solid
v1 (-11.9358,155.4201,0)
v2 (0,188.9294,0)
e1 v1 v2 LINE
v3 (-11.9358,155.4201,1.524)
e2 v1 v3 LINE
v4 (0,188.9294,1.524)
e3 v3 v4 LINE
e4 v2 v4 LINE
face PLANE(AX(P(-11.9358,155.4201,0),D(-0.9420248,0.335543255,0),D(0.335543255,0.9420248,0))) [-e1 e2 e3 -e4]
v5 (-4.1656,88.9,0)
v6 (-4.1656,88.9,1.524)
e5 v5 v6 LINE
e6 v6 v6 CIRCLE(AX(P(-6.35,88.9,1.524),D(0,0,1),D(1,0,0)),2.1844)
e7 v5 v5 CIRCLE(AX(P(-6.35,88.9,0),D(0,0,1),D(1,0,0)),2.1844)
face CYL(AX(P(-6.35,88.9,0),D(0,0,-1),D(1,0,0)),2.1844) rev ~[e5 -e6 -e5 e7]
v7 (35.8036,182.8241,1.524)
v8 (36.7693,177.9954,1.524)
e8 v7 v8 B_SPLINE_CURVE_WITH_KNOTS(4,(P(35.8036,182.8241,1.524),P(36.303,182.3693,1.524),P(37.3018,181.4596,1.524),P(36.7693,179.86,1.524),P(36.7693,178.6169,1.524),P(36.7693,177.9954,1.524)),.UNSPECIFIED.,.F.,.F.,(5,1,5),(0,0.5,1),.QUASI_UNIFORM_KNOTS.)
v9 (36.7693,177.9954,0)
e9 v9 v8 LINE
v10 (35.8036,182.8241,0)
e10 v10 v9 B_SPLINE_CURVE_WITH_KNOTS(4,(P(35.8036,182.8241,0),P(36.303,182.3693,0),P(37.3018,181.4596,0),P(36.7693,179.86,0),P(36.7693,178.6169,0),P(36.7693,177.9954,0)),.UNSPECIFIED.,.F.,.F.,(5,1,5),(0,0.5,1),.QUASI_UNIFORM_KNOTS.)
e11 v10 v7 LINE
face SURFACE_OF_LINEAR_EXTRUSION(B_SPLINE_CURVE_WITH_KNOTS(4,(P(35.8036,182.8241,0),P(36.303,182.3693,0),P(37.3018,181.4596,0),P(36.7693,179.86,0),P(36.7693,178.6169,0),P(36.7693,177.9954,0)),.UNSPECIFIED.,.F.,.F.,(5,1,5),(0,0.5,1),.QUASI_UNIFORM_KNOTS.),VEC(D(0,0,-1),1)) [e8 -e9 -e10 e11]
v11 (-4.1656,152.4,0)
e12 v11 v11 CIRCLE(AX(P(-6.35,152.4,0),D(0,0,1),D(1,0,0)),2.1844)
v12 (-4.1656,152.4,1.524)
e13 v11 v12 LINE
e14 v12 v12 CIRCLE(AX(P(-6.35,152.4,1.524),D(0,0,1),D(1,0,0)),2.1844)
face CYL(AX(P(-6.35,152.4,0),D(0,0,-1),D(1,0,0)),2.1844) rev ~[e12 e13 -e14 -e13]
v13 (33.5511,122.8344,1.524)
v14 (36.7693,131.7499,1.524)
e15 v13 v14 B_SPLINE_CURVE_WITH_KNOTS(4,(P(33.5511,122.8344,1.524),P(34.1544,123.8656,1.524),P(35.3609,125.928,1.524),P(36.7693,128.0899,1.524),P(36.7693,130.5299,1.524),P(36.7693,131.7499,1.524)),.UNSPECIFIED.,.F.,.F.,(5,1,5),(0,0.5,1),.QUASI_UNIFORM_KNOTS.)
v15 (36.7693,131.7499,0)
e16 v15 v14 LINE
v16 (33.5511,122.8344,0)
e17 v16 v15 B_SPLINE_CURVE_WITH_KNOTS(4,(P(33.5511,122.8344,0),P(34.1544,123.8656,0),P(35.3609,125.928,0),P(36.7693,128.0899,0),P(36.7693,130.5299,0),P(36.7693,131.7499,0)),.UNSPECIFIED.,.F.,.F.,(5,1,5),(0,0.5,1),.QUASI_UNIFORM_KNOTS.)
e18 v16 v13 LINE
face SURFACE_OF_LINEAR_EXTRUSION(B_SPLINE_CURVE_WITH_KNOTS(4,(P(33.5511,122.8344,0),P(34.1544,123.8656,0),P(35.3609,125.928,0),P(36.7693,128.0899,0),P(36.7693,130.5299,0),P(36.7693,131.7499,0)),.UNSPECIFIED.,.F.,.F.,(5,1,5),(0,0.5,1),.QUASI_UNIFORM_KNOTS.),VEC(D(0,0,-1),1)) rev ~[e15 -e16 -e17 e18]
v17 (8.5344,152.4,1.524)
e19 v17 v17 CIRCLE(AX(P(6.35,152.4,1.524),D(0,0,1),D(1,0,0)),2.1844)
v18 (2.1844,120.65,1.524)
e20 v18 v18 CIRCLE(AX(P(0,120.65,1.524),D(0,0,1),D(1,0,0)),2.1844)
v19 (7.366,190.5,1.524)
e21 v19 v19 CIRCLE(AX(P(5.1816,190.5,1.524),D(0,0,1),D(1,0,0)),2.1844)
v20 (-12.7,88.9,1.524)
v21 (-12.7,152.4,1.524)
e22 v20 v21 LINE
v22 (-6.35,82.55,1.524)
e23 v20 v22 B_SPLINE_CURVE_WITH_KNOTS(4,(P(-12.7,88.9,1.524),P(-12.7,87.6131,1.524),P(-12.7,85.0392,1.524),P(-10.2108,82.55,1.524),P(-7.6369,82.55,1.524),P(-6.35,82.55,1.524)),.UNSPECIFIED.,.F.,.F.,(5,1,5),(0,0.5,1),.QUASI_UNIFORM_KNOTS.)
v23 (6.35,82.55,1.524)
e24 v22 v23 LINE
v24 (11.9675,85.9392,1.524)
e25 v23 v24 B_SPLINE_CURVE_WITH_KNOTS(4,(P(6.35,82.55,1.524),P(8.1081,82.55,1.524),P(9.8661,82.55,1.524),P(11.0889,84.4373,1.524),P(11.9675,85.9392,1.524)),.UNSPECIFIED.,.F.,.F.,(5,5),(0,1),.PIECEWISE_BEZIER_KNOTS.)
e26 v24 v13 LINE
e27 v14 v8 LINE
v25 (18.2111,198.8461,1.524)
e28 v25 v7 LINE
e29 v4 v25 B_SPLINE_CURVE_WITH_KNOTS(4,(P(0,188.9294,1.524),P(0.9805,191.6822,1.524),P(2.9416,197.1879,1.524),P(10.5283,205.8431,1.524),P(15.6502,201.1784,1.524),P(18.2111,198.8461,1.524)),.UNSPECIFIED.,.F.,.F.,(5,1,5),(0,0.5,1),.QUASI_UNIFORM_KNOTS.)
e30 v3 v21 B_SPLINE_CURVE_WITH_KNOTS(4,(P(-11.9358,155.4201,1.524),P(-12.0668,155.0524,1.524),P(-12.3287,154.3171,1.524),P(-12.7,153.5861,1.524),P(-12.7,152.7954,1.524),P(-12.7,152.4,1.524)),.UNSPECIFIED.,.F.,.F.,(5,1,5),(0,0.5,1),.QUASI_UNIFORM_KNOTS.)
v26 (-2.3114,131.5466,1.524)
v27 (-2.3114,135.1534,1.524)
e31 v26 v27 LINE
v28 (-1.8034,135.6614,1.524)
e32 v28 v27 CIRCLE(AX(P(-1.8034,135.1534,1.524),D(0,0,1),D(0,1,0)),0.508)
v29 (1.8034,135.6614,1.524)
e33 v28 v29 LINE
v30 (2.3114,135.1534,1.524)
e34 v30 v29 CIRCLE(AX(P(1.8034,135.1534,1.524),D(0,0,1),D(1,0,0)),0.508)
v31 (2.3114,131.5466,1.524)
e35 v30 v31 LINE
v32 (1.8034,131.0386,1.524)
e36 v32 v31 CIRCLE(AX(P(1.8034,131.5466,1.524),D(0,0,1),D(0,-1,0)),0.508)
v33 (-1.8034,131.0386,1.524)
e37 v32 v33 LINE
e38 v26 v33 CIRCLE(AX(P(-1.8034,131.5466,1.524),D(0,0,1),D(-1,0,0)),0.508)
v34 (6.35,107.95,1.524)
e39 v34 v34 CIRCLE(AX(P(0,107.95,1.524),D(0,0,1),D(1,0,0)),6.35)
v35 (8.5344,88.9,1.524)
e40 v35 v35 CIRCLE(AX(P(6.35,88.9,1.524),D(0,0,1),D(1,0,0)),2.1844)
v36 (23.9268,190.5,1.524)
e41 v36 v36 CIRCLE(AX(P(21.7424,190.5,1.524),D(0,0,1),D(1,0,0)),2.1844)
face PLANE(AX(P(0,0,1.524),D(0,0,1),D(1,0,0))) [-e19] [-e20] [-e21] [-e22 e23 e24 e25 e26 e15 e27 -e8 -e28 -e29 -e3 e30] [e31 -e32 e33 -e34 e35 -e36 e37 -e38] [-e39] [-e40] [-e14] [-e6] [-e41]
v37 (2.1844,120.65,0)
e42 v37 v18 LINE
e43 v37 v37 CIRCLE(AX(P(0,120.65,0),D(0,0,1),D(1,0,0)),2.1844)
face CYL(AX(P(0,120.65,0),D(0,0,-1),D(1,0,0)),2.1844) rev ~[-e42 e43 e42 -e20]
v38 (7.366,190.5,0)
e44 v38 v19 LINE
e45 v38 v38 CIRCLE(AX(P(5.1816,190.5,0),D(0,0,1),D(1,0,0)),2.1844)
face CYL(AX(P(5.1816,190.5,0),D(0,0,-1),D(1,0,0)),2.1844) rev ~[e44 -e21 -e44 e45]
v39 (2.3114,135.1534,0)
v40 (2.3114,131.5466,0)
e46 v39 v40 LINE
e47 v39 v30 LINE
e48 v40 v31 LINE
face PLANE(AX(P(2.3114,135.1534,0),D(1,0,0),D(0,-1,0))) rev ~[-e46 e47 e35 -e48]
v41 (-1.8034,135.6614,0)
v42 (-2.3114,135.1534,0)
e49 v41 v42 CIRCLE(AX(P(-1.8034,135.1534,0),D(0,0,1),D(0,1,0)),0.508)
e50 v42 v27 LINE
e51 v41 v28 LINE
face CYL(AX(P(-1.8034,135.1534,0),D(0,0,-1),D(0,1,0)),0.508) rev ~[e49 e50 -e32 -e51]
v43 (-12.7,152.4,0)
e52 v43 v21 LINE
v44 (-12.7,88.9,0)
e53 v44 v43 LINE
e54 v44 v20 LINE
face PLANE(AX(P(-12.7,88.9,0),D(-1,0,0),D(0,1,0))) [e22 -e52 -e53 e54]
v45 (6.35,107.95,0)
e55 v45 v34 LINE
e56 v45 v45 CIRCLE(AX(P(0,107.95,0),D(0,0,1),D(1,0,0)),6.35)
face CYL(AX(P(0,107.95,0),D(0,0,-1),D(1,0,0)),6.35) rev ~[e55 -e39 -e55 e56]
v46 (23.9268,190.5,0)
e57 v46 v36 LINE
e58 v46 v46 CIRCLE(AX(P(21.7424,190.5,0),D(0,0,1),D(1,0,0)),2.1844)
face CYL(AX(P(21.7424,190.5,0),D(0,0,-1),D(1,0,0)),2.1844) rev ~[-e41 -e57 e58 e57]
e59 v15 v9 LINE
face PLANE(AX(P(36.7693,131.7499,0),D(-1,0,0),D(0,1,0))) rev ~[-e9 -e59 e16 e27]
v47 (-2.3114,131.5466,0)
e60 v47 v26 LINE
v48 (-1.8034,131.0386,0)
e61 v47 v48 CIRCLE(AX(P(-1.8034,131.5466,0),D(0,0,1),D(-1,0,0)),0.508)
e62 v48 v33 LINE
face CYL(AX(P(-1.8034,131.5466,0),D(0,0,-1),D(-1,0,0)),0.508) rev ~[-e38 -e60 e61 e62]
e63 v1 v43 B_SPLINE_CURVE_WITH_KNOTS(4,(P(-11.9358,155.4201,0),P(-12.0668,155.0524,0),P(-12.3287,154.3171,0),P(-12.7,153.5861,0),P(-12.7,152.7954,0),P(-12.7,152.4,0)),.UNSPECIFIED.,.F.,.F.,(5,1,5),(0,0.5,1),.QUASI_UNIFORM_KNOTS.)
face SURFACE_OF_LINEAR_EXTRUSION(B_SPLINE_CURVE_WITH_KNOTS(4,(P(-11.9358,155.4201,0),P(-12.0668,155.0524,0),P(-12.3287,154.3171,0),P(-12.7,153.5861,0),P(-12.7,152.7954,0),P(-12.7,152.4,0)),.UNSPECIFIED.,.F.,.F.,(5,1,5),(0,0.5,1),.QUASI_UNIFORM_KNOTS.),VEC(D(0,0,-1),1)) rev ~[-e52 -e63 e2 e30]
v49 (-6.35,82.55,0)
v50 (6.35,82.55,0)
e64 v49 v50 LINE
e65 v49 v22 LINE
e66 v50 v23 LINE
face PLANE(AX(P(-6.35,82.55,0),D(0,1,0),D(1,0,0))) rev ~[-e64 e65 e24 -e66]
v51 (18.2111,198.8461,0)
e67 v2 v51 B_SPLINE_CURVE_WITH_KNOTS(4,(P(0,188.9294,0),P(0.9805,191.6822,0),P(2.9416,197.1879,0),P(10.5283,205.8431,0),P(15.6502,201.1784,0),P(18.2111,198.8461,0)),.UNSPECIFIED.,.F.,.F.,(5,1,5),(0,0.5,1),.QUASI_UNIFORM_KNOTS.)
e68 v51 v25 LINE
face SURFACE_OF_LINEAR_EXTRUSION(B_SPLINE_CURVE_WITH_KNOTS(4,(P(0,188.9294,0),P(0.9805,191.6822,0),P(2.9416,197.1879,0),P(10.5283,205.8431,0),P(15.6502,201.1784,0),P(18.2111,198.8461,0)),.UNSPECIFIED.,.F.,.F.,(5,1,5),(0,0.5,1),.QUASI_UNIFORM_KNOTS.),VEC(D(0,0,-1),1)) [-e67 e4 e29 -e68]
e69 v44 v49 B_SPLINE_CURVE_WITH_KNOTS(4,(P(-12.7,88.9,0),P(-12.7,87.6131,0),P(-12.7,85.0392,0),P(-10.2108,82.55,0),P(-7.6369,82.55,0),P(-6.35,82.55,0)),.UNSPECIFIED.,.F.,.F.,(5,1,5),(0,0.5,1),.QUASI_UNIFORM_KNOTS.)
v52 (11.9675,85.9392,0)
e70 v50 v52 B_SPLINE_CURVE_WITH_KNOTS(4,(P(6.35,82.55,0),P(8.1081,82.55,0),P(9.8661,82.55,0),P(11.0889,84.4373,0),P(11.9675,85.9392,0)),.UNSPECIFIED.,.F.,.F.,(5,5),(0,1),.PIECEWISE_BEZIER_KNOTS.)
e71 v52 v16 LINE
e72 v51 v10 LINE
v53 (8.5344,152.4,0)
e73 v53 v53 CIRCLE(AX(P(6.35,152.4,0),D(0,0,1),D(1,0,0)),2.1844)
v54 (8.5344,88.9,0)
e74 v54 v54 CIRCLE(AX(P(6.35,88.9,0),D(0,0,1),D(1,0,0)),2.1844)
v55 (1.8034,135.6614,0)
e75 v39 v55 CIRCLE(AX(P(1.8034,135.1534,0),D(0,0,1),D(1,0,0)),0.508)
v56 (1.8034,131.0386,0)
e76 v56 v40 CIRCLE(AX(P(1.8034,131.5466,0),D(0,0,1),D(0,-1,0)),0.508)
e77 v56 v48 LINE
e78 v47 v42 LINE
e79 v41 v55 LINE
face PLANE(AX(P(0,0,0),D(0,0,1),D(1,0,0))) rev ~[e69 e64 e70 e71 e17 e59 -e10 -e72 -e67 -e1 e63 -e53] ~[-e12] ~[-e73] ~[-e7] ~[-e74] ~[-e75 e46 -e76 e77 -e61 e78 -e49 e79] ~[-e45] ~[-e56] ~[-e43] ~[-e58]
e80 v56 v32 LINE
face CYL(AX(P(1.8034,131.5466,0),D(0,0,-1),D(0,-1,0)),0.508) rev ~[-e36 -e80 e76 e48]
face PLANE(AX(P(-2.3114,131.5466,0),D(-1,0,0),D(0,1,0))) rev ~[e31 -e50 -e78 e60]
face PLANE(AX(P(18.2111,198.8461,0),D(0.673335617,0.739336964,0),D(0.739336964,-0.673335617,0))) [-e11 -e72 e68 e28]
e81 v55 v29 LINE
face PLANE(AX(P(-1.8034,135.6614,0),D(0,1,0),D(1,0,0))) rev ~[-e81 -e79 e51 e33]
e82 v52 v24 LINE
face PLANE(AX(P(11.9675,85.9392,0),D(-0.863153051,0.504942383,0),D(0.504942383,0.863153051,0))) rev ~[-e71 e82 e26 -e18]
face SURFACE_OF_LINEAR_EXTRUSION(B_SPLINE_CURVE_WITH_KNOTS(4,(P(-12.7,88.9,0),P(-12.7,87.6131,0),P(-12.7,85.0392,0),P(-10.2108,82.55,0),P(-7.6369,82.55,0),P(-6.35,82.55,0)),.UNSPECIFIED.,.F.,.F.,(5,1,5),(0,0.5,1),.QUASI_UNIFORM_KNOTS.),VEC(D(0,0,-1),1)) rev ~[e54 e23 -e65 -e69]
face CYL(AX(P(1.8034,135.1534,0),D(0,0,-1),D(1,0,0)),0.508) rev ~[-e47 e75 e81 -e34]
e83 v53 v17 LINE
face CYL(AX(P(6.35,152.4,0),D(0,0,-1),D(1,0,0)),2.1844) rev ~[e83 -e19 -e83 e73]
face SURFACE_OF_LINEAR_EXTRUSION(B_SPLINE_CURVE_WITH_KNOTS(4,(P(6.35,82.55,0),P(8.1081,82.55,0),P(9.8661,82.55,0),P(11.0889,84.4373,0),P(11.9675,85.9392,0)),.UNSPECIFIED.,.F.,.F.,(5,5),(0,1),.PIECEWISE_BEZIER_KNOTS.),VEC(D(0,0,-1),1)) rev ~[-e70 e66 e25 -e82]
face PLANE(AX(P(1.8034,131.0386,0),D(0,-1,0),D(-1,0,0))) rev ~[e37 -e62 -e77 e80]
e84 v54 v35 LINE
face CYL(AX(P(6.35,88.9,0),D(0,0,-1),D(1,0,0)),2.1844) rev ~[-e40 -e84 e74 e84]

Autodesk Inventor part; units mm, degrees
ref_plane "YZ Plane" through (0, 0, 0) normal (1, 0, 0) x (0, 1, 0)
ref_plane "XZ Plane" through (0, 0, 0) normal (0, 1, 0) x (-1, 0, 0)
ref_plane "XY Plane" through (0, 0, 0) normal (0, 0, 1) x (1, 0, 0)
sketch "Sketch1" plane through (0, 0, 0) normal (0, 0, 1) x (1, 0, 0)
  circle A0 centre (-6.35, 152.4) radius 2.1844
  circle A1 centre (6.35, 152.4) radius 2.1844
  circle A2 centre (-6.35, 88.9) radius 2.1844
  circle A3 centre (6.35, 88.9) radius 2.1844
  arc A4 (-1.8034, 135.6614) -> (-2.3114, 135.1534) centre (-1.8034, 135.1534) ccw
  line L0 (-2.3114, 131.5466) -> (-2.3114, 135.1534)
  line L1 (-1.8034, 135.6614) -> (1.8034, 135.6614)
  arc A5 (-2.3114, 131.5466) -> (-1.8034, 131.0386) centre (-1.8034, 131.5466) ccw
  line L2 (1.8034, 131.0386) -> (-1.8034, 131.0386)
  arc A6 (1.8034, 131.0386) -> (2.3114, 131.5466) centre (1.8034, 131.5466) ccw
  line L3 (2.3114, 135.1534) -> (2.3114, 131.5466)
  arc A7 (2.3114, 135.1534) -> (1.8034, 135.6614) centre (1.8034, 135.1534) ccw
  circle A8 centre (0, 120.65) radius 2.1844
  circle A9 centre (0, 107.95) radius 6.35
  line L4 (36.7693, 131.7499) -> (36.7693, 177.9954)
  line L5 (-12.7, 88.9) -> (-12.7, 152.4)
  line L6 (-6.35, 82.55) -> (6.35, 82.55)
  spline S0 degree 4 poles (-12.7, 88.9) (-12.7, 87.6131) (-12.7, 85.0392) (-10.2108, 82.55) (-7.6369, 82.55) (-6.35, 82.55) knots 0 0 0 0 0 0.5 1 1 1 1 1
  spline S1 degree 4 poles (6.35, 82.55) (8.1081, 82.55) (9.8661, 82.55) (11.0889, 84.4373) (11.9675, 85.9392) knots 0 0 0 0 0 1 1 1 1 1
  line L7 (11.9675, 85.9392) -> (33.5511, 122.8344)
  spline S2 degree 4 poles (33.5511, 122.8344) (34.1544, 123.8656) (35.3609, 125.928) (36.7693, 128.0899) (36.7693, 130.5299) (36.7693, 131.7499) knots 0 0 0 0 0 0.5 1 1 1 1 1
  spline S3 degree 4 poles (-11.9358, 155.4201) (-12.0668, 155.0524) (-12.3287, 154.3171) (-12.7, 153.5861) (-12.7, 152.7954) (-12.7, 152.4) knots 0 0 0 0 0 0.5 1 1 1 1 1
  line L8 (-11.9358, 155.4201) -> (0, 188.9294)
  line L9 (18.2111, 198.8461) -> (35.8036, 182.8241)
  spline S4 degree 4 poles (0, 188.9294) (0.9805, 191.6822) (2.9416, 197.1879) (10.5283, 205.8431) (15.6502, 201.1784) (18.2111, 198.8461) knots 0 0 0 0 0 0.5 1 1 1 1 1
  spline S5 degree 4 poles (35.8036, 182.8241) (36.303, 182.3693) (37.3018, 181.4596) (36.7693, 179.86) (36.7693, 178.6169) (36.7693, 177.9954) knots 0 0 0 0 0 0.5 1 1 1 1 1
  circle A10 centre (21.7424, 190.5) radius 2.1844
  circle A11 centre (5.1816, 190.5) radius 2.1844
  point P0 (0, 0)
  point P1 (21.7424, 177.8)
  point P2 (14.224, 190.5)
  dimension "d1" = 4.3688
  dimension "d2" = 12.7
  dimension "d10" = 0
  dimension "d13" = 16.5608
  dimension "d16" = 12.7
  dimension "d17" = 7.5184
extrude "Extrusion1" add sketch "Sketch1" along normal blind 1.524
sketch "Sketch2" plane through (0, 0, 1.524) normal (0, 0, 1) x (1, 0, 0)
  line L0 (12.9318, 114.6329) -> (12.9318, 139.693) construction
  line L1 (12.9318, 139.693) -> (20.9407, 139.693) construction
  line L2 (20.9407, 139.693) -> (20.9407, 114.6329) construction
  line L3 (20.9407, 114.6329) -> (12.9318, 114.6329) construction
  line L4 (-6.35, 82.55) -> (6.35, 82.55) projected
  line L5 (11.9675, 85.9392) -> (33.5511, 122.8344) projected
  line L6 (36.7693, 131.7499) -> (36.7693, 177.9954) projected
  line L7 (35.8036, 182.8241) -> (18.2111, 198.8461) projected
  line L8 (0, 188.9294) -> (-11.9358, 155.4201) projected
  line L9 (-12.7, 152.4) -> (-12.7, 88.9) projected
  circle A0 centre (-6.35, 152.4) radius 2.1844 projected
  circle A1 centre (6.35, 152.4) radius 2.1844 projected
  circle A2 centre (6.35, 88.9) radius 2.1844 projected
  circle A3 centre (0, 120.65) radius 2.1844 projected
  circle A4 centre (0, 107.95) radius 6.35 projected
  circle A5 centre (21.7424, 190.5) radius 2.1844 projected
  circle A6 centre (5.1816, 190.5) radius 2.1844 projected
  line L10 (2.3114, 135.1534) -> (2.3114, 131.5466) projected
  arc A7 (1.8034, 131.0386) -> (2.3114, 131.5466) centre (1.8034, 131.5466) ccw projected
  line L11 (1.8034, 131.0386) -> (-1.8034, 131.0386) projected
  arc A8 (-2.3114, 131.5466) -> (-1.8034, 131.0386) centre (-1.8034, 131.5466) ccw projected
  line L12 (-2.3114, 131.5466) -> (-2.3114, 135.1534) projected
  arc A9 (-1.8034, 135.6614) -> (-2.3114, 135.1534) centre (-1.8034, 135.1534) ccw projected
  line L13 (-1.8034, 135.6614) -> (1.8034, 135.6614) projected
  arc A10 (2.3114, 135.1534) -> (1.8034, 135.6614) centre (1.8034, 135.1534) ccw projected
  circle A11 centre (-6.35, 88.9) radius 2.1844 projected
  point P0 (0, 0)
properties part number "sled"
